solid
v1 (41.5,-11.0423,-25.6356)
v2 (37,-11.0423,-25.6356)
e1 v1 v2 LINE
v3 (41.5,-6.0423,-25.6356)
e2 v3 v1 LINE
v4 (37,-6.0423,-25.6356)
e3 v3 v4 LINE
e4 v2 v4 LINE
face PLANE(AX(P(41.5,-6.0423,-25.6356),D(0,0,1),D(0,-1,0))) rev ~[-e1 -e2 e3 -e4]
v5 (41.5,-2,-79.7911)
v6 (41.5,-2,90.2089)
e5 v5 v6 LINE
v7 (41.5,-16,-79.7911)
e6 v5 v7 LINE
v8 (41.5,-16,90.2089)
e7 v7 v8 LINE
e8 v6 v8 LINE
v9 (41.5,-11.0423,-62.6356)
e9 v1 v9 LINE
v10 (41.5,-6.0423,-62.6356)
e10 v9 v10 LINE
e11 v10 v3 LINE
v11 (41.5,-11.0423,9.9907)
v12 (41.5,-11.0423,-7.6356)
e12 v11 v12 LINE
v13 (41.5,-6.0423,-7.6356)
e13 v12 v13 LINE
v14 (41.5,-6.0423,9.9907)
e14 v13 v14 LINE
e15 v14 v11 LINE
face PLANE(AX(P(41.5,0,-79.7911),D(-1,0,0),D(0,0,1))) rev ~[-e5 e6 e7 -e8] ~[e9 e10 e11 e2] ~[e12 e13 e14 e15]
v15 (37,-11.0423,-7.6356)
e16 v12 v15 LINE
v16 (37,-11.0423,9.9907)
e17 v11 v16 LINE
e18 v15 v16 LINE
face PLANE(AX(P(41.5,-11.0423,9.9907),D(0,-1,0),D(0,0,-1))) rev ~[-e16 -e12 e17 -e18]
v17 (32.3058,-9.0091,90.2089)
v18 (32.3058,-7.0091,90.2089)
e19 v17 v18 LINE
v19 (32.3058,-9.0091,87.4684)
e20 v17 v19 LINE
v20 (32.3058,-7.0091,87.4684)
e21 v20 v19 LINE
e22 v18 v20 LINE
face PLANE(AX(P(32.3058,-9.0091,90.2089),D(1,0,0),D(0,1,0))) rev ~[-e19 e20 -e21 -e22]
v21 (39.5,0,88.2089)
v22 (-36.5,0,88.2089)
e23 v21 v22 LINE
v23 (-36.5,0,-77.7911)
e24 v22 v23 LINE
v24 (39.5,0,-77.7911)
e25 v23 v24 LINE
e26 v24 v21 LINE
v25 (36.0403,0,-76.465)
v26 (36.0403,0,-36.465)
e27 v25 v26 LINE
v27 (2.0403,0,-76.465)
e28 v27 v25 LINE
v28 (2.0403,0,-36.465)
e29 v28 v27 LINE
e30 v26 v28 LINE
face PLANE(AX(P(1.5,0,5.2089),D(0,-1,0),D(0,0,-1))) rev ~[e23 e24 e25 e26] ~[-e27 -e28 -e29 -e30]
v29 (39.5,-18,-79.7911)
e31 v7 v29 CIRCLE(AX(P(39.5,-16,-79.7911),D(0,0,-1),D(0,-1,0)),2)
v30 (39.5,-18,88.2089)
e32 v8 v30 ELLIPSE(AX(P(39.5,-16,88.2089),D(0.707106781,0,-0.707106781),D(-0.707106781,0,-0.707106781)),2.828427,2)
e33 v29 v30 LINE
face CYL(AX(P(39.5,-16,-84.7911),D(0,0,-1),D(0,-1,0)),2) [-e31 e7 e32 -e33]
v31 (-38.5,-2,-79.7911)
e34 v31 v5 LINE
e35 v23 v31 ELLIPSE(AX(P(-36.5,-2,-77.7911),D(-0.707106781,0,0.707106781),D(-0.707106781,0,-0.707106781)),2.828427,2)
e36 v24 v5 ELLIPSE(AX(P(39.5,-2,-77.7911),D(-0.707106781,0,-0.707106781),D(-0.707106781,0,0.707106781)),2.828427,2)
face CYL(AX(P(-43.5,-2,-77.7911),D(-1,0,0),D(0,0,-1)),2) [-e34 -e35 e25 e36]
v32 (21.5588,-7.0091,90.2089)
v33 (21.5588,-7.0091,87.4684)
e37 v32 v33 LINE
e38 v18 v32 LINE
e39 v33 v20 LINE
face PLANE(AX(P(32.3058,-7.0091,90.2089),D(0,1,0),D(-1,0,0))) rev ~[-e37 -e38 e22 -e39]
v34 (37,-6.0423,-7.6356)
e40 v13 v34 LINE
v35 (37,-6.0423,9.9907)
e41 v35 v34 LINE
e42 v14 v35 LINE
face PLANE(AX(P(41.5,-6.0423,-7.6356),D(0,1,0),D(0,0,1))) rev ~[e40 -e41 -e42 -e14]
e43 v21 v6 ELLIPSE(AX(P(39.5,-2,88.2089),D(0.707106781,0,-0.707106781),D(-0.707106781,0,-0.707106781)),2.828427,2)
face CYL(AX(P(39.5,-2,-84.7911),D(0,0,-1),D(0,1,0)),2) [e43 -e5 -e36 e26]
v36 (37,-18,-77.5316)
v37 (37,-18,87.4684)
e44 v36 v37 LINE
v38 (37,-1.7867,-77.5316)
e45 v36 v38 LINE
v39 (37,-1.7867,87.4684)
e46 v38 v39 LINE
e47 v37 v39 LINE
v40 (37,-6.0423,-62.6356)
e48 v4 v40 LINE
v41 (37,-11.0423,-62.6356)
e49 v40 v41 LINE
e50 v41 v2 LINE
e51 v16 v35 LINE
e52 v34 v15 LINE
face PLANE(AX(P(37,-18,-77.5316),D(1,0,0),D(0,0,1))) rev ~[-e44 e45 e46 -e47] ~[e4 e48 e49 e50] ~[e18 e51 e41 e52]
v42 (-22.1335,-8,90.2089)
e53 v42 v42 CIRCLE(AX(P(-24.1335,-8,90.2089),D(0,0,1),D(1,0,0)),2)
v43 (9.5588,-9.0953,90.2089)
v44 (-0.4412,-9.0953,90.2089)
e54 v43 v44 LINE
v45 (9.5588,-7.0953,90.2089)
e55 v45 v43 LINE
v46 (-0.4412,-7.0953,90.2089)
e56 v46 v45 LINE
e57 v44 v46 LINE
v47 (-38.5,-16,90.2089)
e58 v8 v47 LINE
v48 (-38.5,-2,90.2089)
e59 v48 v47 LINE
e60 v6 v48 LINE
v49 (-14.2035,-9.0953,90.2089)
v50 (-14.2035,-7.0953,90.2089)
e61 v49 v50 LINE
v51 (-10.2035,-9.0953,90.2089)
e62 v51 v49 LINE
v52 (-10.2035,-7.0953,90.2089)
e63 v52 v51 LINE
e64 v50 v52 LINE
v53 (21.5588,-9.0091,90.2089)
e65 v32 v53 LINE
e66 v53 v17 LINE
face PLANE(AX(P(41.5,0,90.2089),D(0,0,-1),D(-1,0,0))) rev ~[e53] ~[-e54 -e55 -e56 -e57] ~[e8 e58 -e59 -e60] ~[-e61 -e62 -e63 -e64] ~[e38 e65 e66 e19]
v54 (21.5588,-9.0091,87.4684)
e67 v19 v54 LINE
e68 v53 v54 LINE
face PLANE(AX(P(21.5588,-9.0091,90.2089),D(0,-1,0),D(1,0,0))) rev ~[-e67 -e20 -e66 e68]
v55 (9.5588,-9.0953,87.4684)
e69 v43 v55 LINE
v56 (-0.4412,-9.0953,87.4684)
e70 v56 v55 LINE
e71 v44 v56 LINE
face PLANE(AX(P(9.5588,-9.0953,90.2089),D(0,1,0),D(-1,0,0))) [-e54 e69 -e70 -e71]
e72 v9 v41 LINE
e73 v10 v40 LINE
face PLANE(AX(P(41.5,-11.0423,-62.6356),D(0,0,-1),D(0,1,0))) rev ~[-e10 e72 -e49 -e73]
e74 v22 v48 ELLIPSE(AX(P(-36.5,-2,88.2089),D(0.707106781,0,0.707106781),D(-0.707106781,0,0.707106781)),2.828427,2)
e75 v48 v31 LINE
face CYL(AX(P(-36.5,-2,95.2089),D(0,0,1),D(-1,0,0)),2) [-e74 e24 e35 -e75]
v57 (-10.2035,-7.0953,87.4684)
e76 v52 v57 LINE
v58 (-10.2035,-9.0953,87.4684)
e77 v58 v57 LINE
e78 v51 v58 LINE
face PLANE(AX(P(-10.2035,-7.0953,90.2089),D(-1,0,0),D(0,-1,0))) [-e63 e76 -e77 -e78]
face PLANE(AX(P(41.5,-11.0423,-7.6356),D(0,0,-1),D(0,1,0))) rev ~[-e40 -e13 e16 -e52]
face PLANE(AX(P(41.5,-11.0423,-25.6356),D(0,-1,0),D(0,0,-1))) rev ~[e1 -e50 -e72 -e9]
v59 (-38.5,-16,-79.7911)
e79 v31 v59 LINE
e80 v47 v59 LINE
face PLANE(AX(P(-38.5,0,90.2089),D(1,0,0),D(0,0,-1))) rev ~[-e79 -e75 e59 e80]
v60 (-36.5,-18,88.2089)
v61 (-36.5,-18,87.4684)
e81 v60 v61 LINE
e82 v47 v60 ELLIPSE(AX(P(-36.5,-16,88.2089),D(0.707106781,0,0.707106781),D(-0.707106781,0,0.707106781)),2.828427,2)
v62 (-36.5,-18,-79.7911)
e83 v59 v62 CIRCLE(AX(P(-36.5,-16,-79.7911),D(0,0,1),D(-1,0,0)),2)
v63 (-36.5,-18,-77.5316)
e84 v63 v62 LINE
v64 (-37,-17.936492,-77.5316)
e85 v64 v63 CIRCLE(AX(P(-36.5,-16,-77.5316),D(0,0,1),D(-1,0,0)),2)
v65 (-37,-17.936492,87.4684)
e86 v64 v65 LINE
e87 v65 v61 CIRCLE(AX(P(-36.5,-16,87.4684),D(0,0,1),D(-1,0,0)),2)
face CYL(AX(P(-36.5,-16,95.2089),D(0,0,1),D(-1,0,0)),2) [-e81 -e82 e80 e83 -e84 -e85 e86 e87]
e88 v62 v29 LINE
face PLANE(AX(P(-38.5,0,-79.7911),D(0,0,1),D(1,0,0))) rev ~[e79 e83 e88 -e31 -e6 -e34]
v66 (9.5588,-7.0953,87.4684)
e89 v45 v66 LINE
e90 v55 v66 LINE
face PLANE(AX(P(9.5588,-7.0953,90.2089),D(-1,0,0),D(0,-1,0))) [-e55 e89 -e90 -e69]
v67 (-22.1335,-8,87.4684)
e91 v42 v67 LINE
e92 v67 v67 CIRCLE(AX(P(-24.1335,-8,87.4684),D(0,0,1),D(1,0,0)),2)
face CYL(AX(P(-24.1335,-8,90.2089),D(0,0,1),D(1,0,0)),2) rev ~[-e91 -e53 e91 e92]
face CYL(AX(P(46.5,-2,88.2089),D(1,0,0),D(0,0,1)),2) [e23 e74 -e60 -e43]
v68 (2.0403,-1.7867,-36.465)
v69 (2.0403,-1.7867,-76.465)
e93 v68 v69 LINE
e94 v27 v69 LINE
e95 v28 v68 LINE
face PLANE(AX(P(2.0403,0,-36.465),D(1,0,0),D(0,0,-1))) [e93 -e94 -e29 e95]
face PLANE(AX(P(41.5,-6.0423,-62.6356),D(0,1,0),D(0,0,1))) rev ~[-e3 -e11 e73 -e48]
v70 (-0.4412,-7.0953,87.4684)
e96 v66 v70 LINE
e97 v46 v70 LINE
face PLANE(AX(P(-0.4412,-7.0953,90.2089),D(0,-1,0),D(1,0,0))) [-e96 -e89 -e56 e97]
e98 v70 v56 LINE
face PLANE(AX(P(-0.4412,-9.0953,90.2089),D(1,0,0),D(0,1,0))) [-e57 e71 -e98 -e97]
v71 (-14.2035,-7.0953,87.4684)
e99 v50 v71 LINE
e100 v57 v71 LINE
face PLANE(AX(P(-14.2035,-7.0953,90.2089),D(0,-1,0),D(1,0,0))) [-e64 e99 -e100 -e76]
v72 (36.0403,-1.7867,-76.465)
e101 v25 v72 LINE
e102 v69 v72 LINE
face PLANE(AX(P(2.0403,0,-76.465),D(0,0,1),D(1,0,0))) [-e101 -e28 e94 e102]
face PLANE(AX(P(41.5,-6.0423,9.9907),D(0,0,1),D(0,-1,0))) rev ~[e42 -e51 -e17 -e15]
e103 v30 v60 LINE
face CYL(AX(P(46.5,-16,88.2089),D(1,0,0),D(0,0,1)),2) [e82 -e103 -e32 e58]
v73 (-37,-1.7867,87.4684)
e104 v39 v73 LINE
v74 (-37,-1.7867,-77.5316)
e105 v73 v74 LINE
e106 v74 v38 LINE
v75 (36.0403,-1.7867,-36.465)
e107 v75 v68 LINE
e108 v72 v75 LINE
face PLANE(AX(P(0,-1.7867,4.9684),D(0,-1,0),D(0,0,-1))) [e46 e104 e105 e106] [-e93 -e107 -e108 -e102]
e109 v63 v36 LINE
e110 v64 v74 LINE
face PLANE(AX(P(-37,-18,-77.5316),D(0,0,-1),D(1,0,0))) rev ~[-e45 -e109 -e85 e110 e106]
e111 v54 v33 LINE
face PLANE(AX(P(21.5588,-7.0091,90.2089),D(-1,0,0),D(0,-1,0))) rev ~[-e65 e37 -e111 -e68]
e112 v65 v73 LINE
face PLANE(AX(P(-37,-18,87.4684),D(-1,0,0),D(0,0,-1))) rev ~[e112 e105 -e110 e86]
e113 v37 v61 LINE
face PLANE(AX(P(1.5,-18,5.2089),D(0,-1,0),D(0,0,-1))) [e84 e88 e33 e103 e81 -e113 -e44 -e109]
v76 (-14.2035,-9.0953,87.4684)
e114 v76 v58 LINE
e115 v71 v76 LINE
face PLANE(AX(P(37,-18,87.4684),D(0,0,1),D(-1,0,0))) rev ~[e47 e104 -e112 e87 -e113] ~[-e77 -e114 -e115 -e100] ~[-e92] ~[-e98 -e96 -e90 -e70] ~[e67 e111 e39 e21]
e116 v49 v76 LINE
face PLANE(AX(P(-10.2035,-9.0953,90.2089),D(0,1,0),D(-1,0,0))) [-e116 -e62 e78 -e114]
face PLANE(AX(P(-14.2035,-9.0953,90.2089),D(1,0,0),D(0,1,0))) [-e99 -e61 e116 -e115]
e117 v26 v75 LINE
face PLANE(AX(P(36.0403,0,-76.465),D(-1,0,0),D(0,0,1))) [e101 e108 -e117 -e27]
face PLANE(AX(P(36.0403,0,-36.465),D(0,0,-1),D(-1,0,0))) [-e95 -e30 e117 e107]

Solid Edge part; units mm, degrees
sketch "Sketch1" plane through (0, 0, 0) normal (0, -1, 0) x (1, 0, 0)
  line L0 (-38.5, 90.2089) -> (-38.5, -79.7911)
  line L1 (-38.5, -79.7911) -> (41.5, -79.7911)
  line L2 (41.5, -79.7911) -> (41.5, 90.2089)
  line L3 (41.5, 90.2089) -> (-38.5, 90.2089)
extrude "Protrusion1" add sketch "Sketch1" along normal blind 18
sketch "Sketch2" plane through (1.5, -18, 5.2089) normal (0, -1, 0) x (1, 0, 0)
  line L0 (35.5, -82.7405) -> (35.5, 82.2595)
  line L1 (35.5, 82.2595) -> (-38.5, 82.2595)
  line L2 (-38.5, 82.2595) -> (-38.5, -82.7405)
  line L3 (-38.5, -82.7405) -> (35.5, -82.7405)
extrude "ExtrudedCutout_1" cut sketch "Sketch2" against normal blind 16.2133
sketch "Sketch3" plane through (1.5, 0, 5.2089) normal (0, 1, 0) x (0, 0, 1)
  line L0 (-81.6739, 0.5403) -> (-81.6739, 34.5403)
  line L1 (-81.6739, 34.5403) -> (-41.6739, 34.5403)
  line L2 (-41.6739, 34.5403) -> (-41.6739, 0.5403)
  line L3 (-41.6739, 0.5403) -> (-81.6739, 0.5403)
extrude "Cutout1" cut sketch "Sketch3" against normal up to next
fillet "Round_1" radius 2 7 edges at (-38.5, -18, 5.2089) (41.5, -18, 5.2089) (1.5, 0, -79.7911) (1.5, -18, 90.2089) (41.5, 0, 5.2089) (-38.5, 0, 5.2089) (1.5, 0, 90.2089)
sketch "Sketch4" plane through (41.5, -9, 5.2089) normal (1, 0, 0) x (0, 0, -1)
  line L0 (67.8445, -2.0423) -> (67.8445, 2.9577)
  line L1 (67.8445, 2.9577) -> (30.8445, 2.9577)
  line L2 (30.8445, 2.9577) -> (30.8445, -2.0423)
  line L3 (30.8445, -2.0423) -> (67.8445, -2.0423)
extrude "Cutout2" cut sketch "Sketch4" against normal up to next
sketch "Sketch5" plane through (41.5, -9, 5.2089) normal (1, 0, 0) x (0, 0, -1)
  line L0 (-4.7818, 2.9577) -> (-4.7818, -2.0423)
  line L1 (-4.7818, -2.0423) -> (12.8445, -2.0423)
  line L2 (12.8445, -2.0423) -> (12.8445, 2.9577)
  line L3 (12.8445, 2.9577) -> (-4.7818, 2.9577)
extrude "Cutout3" cut sketch "Sketch5" against normal up to next
sketch "Sketch6" plane through (1.5, -9, 90.2089) normal (0, 0, 1) x (1, 0, 0)
  circle A0 centre (-25.6335, 1) radius 2
extrude "Cutout4" cut sketch "Sketch6" along normal up to next and the other way up to next
sketch "Sketch7" plane through (-14.2035, -9.0953, 90.2089) normal (0, 0, 1) x (1, 0, 0)
  line L0 (0, 2) -> (4, 2)
  line L1 (4, 2) -> (4, 0)
  line L2 (4, 0) -> (0, 0)
  line L3 (0, 0) -> (0, 2)
extrude "Cutout5" cut sketch "Sketch7" against normal up to next
sketch "Sketch8" plane through (1.5, -9, 90.2089) normal (0, 0, 1) x (1, 0, 0)
  line L0 (-1.9412, -0.0953) -> (-1.9412, 1.9047)
  line L1 (-1.9412, 1.9047) -> (8.0588, 1.9047)
  line L2 (8.0588, 1.9047) -> (8.0588, -0.0953)
  line L3 (8.0588, -0.0953) -> (-1.9412, -0.0953)
extrude "Cutout6" cut sketch "Sketch8" against normal up to next
sketch "Sketch9" plane through (1.5, -9, 90.2089) normal (0, 0, 1) x (1, 0, 0)
  line L0 (20.0588, 1.9909) -> (20.0588, -0.0091)
  line L1 (20.0588, -0.0091) -> (30.8058, -0.0091)
  line L2 (30.8058, -0.0091) -> (30.8058, 1.9909)
  line L3 (30.8058, 1.9909) -> (20.0588, 1.9909)
extrude "Cutout7" cut sketch "Sketch9" against normal up to next
